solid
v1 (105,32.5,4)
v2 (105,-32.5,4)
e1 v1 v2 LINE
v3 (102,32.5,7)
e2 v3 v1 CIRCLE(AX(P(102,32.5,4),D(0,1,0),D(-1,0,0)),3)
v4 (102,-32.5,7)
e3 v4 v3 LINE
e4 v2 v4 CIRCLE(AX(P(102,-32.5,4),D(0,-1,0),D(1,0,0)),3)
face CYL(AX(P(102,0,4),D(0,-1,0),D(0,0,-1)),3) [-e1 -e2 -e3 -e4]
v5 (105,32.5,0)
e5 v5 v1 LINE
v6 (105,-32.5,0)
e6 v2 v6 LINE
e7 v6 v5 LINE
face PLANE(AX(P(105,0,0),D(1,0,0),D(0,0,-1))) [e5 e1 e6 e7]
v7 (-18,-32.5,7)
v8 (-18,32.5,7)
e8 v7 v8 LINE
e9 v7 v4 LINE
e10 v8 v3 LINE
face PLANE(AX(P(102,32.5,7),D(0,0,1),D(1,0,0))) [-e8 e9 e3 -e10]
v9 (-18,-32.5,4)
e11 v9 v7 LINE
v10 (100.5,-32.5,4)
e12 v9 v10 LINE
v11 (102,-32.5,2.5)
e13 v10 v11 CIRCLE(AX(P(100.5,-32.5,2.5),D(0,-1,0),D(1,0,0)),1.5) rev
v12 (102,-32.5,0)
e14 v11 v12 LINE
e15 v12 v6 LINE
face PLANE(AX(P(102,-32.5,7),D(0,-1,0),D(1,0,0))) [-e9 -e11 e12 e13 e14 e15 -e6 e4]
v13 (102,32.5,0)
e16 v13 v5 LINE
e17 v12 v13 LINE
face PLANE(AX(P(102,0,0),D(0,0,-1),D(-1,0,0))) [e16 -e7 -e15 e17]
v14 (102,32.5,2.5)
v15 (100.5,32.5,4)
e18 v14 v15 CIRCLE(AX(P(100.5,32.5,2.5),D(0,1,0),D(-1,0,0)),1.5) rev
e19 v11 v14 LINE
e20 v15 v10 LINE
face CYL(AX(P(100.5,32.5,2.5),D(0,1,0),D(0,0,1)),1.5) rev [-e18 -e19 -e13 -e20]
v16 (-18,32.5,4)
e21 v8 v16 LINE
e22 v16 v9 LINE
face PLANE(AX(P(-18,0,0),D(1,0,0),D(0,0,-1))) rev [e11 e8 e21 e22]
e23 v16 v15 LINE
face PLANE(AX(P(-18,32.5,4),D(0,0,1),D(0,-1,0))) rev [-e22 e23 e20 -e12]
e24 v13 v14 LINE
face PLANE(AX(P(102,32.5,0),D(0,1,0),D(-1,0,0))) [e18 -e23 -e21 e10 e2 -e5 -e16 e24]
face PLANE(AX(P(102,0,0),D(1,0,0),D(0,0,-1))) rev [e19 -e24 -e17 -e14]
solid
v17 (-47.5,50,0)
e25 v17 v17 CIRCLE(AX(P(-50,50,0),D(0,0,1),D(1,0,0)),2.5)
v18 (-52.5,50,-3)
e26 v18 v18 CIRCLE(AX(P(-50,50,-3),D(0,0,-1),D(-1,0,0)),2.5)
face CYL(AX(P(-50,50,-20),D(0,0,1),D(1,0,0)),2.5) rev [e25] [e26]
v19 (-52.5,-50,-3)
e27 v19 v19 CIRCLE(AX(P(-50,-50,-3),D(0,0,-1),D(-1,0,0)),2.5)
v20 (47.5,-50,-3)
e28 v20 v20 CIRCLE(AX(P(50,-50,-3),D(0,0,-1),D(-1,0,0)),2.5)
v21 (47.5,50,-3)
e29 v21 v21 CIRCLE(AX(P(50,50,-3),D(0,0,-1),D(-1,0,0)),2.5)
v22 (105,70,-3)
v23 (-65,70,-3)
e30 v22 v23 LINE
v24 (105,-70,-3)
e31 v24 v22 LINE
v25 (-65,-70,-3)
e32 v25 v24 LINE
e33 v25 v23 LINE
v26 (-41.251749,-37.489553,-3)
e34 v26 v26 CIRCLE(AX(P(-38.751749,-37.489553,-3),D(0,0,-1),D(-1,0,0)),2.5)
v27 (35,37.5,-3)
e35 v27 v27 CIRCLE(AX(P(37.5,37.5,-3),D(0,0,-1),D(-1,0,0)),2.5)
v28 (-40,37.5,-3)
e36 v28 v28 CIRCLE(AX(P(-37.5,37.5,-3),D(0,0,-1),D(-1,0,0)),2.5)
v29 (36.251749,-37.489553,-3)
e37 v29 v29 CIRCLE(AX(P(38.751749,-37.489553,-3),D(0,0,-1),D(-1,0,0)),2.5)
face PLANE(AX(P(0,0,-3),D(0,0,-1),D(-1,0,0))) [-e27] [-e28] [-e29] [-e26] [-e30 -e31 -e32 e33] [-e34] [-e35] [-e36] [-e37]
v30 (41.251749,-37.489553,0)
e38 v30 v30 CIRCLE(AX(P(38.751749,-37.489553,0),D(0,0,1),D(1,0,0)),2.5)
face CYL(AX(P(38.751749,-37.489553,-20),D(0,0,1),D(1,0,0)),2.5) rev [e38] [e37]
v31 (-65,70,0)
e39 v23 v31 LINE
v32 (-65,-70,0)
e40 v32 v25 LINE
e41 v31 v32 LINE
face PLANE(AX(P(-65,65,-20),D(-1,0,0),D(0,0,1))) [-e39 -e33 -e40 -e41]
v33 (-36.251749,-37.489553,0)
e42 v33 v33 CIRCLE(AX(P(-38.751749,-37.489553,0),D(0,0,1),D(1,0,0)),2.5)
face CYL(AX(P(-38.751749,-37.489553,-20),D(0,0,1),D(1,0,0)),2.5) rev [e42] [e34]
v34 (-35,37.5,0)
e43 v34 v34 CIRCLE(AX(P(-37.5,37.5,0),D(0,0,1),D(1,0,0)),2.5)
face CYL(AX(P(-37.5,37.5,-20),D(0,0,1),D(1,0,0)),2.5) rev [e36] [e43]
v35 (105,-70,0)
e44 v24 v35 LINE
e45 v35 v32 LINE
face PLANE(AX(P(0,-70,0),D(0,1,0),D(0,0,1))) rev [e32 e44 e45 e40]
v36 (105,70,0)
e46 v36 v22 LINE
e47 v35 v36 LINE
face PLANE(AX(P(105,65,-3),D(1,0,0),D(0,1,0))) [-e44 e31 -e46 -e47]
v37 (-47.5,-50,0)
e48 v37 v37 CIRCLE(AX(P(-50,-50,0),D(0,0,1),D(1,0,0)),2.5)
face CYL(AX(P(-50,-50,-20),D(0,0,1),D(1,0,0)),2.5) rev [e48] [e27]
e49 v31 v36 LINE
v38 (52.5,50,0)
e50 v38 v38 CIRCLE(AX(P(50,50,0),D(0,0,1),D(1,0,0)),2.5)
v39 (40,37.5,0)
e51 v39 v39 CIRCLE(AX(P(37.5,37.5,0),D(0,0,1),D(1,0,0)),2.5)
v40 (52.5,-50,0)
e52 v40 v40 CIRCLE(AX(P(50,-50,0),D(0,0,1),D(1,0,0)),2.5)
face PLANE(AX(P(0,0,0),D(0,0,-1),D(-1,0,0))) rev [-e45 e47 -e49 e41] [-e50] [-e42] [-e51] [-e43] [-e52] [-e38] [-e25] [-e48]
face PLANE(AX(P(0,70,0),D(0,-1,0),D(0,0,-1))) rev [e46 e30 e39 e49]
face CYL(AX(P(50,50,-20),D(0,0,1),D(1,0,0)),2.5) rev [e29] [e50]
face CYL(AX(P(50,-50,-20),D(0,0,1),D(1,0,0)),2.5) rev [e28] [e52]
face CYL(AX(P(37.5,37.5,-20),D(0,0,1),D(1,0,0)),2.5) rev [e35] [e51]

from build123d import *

# Parameters (mm, degrees)
SKETCH1_W            = 150
SKETCH1_H            = 150
BASE_FLANGE1_DEPTH   = 3
SKETCH23_W           = 150
SKETCH23_H           = 150
SKETCH23_W_2         = 140
SKETCH23_H_2         = 140
BOSS_EXTRUDE3_DEPTH  = 20
SKETCH27_W           = 7
SKETCH27_H           = 150
BOSS_EXTRUDE4_DEPTH  = 20
SKETCH31_R           = 2.5
CUT_EXTRUDE1_DEPTH   = 20
SKETCH33_W           = 170
SKETCH33_H           = 150
CUT_EXTRUDE3_DEPTH   = 20
SKETCH34_W           = 150
SKETCH34_H           = 150
SKETCH34_W_2         = 130
SKETCH34_H_2         = 130
CUT_EXTRUDE4_DEPTH   = 20
SKETCH39_W           = 40
SKETCH39_H           = 130
BOSS_EXTRUDE11_DEPTH = 3
BOSS_EXTRUDE14_DEPTH = 3
SKETCH47_W           = 3
SKETCH47_H           = 65
BOSS_EXTRUDE15_DEPTH = 120
FILLET3_R            = 1.5
FILLET4_R            = 3
SKETCH48_W           = 170
SKETCH48_H           = 3
BOSS_EXTRUDE16_DEPTH = 5
SKETCH49_W           = 170
SKETCH49_H           = 3
BOSS_EXTRUDE17_DEPTH = 5


# Sheet-metal steps are written as plain solids
with BuildPart() as part:
    # Sketch1 → Base-Flange1 (new body)
    with BuildSketch(Plane.XY):
        Rectangle(SKETCH1_W, SKETCH1_H)
    extrude(amount=-BASE_FLANGE1_DEPTH)

    # Sketch23 → Boss-Extrude3 (add)
    with BuildSketch(Plane(origin=(0, 0, -3), x_dir=(-1, 0, 0), z_dir=(0, 0, -1))):
        Rectangle(SKETCH23_W, SKETCH23_H)
        Rectangle(SKETCH23_W_2, SKETCH23_H_2, mode=Mode.SUBTRACT)
    extrude(amount=BOSS_EXTRUDE3_DEPTH)

    # Sketch27 → Boss-Extrude4 (add)
    with BuildSketch(Plane(origin=(75, 0, 0), x_dir=(0, 0, -1), z_dir=(1, 0, 0))):
        with Locations((19.5, 0)):
            Rectangle(SKETCH27_W, SKETCH27_H)
    extrude(amount=BOSS_EXTRUDE4_DEPTH)

    # Sketch31 → Cut-Extrude1 (cut)
    with BuildSketch(Plane.XY):
        with Locations((-50, -50)):
            Circle(SKETCH31_R)
        with Locations((-50, 50)):
            Circle(SKETCH31_R)
        with Locations((50, 50)):
            Circle(SKETCH31_R)
        with Locations((50, -50)):
            Circle(SKETCH31_R)
        with Locations((37.5, 37.5)):
            Circle(SKETCH31_R)
        with Locations((-37.5, 37.5)):
            Circle(SKETCH31_R)
        with Locations((38.751749061, -37.489553434)):
            Circle(SKETCH31_R)
        with Locations((-38.751749061, -37.489553434)):
            Circle(SKETCH31_R)
    extrude(amount=-CUT_EXTRUDE1_DEPTH, mode=Mode.SUBTRACT)

    # Sketch33 → Cut-Extrude3 (cut)
    with BuildSketch(Plane(origin=(0, 0, -23), x_dir=(-1, 0, 0), z_dir=(0, 0, -1))):
        with Locations((-10, 0)):
            Rectangle(SKETCH33_W, SKETCH33_H)
    extrude(amount=-CUT_EXTRUDE3_DEPTH, mode=Mode.SUBTRACT)

    # Sketch34 → Cut-Extrude4 (cut)
    with BuildSketch(Plane.XY):
        Rectangle(SKETCH34_W, SKETCH34_H)
        Rectangle(SKETCH34_W_2, SKETCH34_H_2, mode=Mode.SUBTRACT)
    extrude(amount=-CUT_EXTRUDE4_DEPTH, mode=Mode.SUBTRACT)

    # Sketch39 → Boss-Extrude11 (add)
    with BuildSketch(Plane.XY):
        with Locations((85, 0)):
            Rectangle(SKETCH39_W, SKETCH39_H)
    extrude(amount=-BOSS_EXTRUDE11_DEPTH)

    # Sketch48 → Boss-Extrude16 (add)
    with BuildSketch(Plane(origin=(0, -65, 0), x_dir=(-1, 0, 0), z_dir=(0, -1, 0))):
        with Locations((-20, 1.5)):
            Rectangle(SKETCH48_W, SKETCH48_H)
    extrude(amount=BOSS_EXTRUDE16_DEPTH)

    # Sketch49 → Boss-Extrude17 (add)
    with BuildSketch(Plane(origin=(0, 65, 0), x_dir=(1, 0, 0), z_dir=(0, 1, 0))):
        with Locations((20, 1.5)):
            Rectangle(SKETCH49_W, SKETCH49_H)
    extrude(amount=BOSS_EXTRUDE17_DEPTH)


with BuildPart() as body_2:
    # Sketch46 → Boss-Extrude14 (new body)
    with BuildSketch(Plane(origin=(105, 0, 0), x_dir=(0, 0, -1), z_dir=(1, 0, 0))):
        Polygon((0, 0), (0, 32.5), (-7, 32.5), (-7, -32.5), (0, -32.5), align=None)
    extrude(amount=-BOSS_EXTRUDE14_DEPTH)

    # Sketch47 → Boss-Extrude15 (add)
    with BuildSketch(Plane.ZY.offset(-102)):
        with Locations((5.5, 0)):
            Rectangle(SKETCH47_W, SKETCH47_H)
    extrude(amount=BOSS_EXTRUDE15_DEPTH)

    # Fillet3
    fillet3_edges = [body_2.edges().sort_by_distance(p)[0] for p in [
        (102, 0, 4),
    ]]
    fillet(fillet3_edges, radius=FILLET3_R)

    # Fillet4
    fillet4_edges = [body_2.edges().sort_by_distance(p)[0] for p in [
        (105, 0, 7),
    ]]
    fillet(fillet4_edges, radius=FILLET4_R)


solid = Compound([part.part, body_2.part])
